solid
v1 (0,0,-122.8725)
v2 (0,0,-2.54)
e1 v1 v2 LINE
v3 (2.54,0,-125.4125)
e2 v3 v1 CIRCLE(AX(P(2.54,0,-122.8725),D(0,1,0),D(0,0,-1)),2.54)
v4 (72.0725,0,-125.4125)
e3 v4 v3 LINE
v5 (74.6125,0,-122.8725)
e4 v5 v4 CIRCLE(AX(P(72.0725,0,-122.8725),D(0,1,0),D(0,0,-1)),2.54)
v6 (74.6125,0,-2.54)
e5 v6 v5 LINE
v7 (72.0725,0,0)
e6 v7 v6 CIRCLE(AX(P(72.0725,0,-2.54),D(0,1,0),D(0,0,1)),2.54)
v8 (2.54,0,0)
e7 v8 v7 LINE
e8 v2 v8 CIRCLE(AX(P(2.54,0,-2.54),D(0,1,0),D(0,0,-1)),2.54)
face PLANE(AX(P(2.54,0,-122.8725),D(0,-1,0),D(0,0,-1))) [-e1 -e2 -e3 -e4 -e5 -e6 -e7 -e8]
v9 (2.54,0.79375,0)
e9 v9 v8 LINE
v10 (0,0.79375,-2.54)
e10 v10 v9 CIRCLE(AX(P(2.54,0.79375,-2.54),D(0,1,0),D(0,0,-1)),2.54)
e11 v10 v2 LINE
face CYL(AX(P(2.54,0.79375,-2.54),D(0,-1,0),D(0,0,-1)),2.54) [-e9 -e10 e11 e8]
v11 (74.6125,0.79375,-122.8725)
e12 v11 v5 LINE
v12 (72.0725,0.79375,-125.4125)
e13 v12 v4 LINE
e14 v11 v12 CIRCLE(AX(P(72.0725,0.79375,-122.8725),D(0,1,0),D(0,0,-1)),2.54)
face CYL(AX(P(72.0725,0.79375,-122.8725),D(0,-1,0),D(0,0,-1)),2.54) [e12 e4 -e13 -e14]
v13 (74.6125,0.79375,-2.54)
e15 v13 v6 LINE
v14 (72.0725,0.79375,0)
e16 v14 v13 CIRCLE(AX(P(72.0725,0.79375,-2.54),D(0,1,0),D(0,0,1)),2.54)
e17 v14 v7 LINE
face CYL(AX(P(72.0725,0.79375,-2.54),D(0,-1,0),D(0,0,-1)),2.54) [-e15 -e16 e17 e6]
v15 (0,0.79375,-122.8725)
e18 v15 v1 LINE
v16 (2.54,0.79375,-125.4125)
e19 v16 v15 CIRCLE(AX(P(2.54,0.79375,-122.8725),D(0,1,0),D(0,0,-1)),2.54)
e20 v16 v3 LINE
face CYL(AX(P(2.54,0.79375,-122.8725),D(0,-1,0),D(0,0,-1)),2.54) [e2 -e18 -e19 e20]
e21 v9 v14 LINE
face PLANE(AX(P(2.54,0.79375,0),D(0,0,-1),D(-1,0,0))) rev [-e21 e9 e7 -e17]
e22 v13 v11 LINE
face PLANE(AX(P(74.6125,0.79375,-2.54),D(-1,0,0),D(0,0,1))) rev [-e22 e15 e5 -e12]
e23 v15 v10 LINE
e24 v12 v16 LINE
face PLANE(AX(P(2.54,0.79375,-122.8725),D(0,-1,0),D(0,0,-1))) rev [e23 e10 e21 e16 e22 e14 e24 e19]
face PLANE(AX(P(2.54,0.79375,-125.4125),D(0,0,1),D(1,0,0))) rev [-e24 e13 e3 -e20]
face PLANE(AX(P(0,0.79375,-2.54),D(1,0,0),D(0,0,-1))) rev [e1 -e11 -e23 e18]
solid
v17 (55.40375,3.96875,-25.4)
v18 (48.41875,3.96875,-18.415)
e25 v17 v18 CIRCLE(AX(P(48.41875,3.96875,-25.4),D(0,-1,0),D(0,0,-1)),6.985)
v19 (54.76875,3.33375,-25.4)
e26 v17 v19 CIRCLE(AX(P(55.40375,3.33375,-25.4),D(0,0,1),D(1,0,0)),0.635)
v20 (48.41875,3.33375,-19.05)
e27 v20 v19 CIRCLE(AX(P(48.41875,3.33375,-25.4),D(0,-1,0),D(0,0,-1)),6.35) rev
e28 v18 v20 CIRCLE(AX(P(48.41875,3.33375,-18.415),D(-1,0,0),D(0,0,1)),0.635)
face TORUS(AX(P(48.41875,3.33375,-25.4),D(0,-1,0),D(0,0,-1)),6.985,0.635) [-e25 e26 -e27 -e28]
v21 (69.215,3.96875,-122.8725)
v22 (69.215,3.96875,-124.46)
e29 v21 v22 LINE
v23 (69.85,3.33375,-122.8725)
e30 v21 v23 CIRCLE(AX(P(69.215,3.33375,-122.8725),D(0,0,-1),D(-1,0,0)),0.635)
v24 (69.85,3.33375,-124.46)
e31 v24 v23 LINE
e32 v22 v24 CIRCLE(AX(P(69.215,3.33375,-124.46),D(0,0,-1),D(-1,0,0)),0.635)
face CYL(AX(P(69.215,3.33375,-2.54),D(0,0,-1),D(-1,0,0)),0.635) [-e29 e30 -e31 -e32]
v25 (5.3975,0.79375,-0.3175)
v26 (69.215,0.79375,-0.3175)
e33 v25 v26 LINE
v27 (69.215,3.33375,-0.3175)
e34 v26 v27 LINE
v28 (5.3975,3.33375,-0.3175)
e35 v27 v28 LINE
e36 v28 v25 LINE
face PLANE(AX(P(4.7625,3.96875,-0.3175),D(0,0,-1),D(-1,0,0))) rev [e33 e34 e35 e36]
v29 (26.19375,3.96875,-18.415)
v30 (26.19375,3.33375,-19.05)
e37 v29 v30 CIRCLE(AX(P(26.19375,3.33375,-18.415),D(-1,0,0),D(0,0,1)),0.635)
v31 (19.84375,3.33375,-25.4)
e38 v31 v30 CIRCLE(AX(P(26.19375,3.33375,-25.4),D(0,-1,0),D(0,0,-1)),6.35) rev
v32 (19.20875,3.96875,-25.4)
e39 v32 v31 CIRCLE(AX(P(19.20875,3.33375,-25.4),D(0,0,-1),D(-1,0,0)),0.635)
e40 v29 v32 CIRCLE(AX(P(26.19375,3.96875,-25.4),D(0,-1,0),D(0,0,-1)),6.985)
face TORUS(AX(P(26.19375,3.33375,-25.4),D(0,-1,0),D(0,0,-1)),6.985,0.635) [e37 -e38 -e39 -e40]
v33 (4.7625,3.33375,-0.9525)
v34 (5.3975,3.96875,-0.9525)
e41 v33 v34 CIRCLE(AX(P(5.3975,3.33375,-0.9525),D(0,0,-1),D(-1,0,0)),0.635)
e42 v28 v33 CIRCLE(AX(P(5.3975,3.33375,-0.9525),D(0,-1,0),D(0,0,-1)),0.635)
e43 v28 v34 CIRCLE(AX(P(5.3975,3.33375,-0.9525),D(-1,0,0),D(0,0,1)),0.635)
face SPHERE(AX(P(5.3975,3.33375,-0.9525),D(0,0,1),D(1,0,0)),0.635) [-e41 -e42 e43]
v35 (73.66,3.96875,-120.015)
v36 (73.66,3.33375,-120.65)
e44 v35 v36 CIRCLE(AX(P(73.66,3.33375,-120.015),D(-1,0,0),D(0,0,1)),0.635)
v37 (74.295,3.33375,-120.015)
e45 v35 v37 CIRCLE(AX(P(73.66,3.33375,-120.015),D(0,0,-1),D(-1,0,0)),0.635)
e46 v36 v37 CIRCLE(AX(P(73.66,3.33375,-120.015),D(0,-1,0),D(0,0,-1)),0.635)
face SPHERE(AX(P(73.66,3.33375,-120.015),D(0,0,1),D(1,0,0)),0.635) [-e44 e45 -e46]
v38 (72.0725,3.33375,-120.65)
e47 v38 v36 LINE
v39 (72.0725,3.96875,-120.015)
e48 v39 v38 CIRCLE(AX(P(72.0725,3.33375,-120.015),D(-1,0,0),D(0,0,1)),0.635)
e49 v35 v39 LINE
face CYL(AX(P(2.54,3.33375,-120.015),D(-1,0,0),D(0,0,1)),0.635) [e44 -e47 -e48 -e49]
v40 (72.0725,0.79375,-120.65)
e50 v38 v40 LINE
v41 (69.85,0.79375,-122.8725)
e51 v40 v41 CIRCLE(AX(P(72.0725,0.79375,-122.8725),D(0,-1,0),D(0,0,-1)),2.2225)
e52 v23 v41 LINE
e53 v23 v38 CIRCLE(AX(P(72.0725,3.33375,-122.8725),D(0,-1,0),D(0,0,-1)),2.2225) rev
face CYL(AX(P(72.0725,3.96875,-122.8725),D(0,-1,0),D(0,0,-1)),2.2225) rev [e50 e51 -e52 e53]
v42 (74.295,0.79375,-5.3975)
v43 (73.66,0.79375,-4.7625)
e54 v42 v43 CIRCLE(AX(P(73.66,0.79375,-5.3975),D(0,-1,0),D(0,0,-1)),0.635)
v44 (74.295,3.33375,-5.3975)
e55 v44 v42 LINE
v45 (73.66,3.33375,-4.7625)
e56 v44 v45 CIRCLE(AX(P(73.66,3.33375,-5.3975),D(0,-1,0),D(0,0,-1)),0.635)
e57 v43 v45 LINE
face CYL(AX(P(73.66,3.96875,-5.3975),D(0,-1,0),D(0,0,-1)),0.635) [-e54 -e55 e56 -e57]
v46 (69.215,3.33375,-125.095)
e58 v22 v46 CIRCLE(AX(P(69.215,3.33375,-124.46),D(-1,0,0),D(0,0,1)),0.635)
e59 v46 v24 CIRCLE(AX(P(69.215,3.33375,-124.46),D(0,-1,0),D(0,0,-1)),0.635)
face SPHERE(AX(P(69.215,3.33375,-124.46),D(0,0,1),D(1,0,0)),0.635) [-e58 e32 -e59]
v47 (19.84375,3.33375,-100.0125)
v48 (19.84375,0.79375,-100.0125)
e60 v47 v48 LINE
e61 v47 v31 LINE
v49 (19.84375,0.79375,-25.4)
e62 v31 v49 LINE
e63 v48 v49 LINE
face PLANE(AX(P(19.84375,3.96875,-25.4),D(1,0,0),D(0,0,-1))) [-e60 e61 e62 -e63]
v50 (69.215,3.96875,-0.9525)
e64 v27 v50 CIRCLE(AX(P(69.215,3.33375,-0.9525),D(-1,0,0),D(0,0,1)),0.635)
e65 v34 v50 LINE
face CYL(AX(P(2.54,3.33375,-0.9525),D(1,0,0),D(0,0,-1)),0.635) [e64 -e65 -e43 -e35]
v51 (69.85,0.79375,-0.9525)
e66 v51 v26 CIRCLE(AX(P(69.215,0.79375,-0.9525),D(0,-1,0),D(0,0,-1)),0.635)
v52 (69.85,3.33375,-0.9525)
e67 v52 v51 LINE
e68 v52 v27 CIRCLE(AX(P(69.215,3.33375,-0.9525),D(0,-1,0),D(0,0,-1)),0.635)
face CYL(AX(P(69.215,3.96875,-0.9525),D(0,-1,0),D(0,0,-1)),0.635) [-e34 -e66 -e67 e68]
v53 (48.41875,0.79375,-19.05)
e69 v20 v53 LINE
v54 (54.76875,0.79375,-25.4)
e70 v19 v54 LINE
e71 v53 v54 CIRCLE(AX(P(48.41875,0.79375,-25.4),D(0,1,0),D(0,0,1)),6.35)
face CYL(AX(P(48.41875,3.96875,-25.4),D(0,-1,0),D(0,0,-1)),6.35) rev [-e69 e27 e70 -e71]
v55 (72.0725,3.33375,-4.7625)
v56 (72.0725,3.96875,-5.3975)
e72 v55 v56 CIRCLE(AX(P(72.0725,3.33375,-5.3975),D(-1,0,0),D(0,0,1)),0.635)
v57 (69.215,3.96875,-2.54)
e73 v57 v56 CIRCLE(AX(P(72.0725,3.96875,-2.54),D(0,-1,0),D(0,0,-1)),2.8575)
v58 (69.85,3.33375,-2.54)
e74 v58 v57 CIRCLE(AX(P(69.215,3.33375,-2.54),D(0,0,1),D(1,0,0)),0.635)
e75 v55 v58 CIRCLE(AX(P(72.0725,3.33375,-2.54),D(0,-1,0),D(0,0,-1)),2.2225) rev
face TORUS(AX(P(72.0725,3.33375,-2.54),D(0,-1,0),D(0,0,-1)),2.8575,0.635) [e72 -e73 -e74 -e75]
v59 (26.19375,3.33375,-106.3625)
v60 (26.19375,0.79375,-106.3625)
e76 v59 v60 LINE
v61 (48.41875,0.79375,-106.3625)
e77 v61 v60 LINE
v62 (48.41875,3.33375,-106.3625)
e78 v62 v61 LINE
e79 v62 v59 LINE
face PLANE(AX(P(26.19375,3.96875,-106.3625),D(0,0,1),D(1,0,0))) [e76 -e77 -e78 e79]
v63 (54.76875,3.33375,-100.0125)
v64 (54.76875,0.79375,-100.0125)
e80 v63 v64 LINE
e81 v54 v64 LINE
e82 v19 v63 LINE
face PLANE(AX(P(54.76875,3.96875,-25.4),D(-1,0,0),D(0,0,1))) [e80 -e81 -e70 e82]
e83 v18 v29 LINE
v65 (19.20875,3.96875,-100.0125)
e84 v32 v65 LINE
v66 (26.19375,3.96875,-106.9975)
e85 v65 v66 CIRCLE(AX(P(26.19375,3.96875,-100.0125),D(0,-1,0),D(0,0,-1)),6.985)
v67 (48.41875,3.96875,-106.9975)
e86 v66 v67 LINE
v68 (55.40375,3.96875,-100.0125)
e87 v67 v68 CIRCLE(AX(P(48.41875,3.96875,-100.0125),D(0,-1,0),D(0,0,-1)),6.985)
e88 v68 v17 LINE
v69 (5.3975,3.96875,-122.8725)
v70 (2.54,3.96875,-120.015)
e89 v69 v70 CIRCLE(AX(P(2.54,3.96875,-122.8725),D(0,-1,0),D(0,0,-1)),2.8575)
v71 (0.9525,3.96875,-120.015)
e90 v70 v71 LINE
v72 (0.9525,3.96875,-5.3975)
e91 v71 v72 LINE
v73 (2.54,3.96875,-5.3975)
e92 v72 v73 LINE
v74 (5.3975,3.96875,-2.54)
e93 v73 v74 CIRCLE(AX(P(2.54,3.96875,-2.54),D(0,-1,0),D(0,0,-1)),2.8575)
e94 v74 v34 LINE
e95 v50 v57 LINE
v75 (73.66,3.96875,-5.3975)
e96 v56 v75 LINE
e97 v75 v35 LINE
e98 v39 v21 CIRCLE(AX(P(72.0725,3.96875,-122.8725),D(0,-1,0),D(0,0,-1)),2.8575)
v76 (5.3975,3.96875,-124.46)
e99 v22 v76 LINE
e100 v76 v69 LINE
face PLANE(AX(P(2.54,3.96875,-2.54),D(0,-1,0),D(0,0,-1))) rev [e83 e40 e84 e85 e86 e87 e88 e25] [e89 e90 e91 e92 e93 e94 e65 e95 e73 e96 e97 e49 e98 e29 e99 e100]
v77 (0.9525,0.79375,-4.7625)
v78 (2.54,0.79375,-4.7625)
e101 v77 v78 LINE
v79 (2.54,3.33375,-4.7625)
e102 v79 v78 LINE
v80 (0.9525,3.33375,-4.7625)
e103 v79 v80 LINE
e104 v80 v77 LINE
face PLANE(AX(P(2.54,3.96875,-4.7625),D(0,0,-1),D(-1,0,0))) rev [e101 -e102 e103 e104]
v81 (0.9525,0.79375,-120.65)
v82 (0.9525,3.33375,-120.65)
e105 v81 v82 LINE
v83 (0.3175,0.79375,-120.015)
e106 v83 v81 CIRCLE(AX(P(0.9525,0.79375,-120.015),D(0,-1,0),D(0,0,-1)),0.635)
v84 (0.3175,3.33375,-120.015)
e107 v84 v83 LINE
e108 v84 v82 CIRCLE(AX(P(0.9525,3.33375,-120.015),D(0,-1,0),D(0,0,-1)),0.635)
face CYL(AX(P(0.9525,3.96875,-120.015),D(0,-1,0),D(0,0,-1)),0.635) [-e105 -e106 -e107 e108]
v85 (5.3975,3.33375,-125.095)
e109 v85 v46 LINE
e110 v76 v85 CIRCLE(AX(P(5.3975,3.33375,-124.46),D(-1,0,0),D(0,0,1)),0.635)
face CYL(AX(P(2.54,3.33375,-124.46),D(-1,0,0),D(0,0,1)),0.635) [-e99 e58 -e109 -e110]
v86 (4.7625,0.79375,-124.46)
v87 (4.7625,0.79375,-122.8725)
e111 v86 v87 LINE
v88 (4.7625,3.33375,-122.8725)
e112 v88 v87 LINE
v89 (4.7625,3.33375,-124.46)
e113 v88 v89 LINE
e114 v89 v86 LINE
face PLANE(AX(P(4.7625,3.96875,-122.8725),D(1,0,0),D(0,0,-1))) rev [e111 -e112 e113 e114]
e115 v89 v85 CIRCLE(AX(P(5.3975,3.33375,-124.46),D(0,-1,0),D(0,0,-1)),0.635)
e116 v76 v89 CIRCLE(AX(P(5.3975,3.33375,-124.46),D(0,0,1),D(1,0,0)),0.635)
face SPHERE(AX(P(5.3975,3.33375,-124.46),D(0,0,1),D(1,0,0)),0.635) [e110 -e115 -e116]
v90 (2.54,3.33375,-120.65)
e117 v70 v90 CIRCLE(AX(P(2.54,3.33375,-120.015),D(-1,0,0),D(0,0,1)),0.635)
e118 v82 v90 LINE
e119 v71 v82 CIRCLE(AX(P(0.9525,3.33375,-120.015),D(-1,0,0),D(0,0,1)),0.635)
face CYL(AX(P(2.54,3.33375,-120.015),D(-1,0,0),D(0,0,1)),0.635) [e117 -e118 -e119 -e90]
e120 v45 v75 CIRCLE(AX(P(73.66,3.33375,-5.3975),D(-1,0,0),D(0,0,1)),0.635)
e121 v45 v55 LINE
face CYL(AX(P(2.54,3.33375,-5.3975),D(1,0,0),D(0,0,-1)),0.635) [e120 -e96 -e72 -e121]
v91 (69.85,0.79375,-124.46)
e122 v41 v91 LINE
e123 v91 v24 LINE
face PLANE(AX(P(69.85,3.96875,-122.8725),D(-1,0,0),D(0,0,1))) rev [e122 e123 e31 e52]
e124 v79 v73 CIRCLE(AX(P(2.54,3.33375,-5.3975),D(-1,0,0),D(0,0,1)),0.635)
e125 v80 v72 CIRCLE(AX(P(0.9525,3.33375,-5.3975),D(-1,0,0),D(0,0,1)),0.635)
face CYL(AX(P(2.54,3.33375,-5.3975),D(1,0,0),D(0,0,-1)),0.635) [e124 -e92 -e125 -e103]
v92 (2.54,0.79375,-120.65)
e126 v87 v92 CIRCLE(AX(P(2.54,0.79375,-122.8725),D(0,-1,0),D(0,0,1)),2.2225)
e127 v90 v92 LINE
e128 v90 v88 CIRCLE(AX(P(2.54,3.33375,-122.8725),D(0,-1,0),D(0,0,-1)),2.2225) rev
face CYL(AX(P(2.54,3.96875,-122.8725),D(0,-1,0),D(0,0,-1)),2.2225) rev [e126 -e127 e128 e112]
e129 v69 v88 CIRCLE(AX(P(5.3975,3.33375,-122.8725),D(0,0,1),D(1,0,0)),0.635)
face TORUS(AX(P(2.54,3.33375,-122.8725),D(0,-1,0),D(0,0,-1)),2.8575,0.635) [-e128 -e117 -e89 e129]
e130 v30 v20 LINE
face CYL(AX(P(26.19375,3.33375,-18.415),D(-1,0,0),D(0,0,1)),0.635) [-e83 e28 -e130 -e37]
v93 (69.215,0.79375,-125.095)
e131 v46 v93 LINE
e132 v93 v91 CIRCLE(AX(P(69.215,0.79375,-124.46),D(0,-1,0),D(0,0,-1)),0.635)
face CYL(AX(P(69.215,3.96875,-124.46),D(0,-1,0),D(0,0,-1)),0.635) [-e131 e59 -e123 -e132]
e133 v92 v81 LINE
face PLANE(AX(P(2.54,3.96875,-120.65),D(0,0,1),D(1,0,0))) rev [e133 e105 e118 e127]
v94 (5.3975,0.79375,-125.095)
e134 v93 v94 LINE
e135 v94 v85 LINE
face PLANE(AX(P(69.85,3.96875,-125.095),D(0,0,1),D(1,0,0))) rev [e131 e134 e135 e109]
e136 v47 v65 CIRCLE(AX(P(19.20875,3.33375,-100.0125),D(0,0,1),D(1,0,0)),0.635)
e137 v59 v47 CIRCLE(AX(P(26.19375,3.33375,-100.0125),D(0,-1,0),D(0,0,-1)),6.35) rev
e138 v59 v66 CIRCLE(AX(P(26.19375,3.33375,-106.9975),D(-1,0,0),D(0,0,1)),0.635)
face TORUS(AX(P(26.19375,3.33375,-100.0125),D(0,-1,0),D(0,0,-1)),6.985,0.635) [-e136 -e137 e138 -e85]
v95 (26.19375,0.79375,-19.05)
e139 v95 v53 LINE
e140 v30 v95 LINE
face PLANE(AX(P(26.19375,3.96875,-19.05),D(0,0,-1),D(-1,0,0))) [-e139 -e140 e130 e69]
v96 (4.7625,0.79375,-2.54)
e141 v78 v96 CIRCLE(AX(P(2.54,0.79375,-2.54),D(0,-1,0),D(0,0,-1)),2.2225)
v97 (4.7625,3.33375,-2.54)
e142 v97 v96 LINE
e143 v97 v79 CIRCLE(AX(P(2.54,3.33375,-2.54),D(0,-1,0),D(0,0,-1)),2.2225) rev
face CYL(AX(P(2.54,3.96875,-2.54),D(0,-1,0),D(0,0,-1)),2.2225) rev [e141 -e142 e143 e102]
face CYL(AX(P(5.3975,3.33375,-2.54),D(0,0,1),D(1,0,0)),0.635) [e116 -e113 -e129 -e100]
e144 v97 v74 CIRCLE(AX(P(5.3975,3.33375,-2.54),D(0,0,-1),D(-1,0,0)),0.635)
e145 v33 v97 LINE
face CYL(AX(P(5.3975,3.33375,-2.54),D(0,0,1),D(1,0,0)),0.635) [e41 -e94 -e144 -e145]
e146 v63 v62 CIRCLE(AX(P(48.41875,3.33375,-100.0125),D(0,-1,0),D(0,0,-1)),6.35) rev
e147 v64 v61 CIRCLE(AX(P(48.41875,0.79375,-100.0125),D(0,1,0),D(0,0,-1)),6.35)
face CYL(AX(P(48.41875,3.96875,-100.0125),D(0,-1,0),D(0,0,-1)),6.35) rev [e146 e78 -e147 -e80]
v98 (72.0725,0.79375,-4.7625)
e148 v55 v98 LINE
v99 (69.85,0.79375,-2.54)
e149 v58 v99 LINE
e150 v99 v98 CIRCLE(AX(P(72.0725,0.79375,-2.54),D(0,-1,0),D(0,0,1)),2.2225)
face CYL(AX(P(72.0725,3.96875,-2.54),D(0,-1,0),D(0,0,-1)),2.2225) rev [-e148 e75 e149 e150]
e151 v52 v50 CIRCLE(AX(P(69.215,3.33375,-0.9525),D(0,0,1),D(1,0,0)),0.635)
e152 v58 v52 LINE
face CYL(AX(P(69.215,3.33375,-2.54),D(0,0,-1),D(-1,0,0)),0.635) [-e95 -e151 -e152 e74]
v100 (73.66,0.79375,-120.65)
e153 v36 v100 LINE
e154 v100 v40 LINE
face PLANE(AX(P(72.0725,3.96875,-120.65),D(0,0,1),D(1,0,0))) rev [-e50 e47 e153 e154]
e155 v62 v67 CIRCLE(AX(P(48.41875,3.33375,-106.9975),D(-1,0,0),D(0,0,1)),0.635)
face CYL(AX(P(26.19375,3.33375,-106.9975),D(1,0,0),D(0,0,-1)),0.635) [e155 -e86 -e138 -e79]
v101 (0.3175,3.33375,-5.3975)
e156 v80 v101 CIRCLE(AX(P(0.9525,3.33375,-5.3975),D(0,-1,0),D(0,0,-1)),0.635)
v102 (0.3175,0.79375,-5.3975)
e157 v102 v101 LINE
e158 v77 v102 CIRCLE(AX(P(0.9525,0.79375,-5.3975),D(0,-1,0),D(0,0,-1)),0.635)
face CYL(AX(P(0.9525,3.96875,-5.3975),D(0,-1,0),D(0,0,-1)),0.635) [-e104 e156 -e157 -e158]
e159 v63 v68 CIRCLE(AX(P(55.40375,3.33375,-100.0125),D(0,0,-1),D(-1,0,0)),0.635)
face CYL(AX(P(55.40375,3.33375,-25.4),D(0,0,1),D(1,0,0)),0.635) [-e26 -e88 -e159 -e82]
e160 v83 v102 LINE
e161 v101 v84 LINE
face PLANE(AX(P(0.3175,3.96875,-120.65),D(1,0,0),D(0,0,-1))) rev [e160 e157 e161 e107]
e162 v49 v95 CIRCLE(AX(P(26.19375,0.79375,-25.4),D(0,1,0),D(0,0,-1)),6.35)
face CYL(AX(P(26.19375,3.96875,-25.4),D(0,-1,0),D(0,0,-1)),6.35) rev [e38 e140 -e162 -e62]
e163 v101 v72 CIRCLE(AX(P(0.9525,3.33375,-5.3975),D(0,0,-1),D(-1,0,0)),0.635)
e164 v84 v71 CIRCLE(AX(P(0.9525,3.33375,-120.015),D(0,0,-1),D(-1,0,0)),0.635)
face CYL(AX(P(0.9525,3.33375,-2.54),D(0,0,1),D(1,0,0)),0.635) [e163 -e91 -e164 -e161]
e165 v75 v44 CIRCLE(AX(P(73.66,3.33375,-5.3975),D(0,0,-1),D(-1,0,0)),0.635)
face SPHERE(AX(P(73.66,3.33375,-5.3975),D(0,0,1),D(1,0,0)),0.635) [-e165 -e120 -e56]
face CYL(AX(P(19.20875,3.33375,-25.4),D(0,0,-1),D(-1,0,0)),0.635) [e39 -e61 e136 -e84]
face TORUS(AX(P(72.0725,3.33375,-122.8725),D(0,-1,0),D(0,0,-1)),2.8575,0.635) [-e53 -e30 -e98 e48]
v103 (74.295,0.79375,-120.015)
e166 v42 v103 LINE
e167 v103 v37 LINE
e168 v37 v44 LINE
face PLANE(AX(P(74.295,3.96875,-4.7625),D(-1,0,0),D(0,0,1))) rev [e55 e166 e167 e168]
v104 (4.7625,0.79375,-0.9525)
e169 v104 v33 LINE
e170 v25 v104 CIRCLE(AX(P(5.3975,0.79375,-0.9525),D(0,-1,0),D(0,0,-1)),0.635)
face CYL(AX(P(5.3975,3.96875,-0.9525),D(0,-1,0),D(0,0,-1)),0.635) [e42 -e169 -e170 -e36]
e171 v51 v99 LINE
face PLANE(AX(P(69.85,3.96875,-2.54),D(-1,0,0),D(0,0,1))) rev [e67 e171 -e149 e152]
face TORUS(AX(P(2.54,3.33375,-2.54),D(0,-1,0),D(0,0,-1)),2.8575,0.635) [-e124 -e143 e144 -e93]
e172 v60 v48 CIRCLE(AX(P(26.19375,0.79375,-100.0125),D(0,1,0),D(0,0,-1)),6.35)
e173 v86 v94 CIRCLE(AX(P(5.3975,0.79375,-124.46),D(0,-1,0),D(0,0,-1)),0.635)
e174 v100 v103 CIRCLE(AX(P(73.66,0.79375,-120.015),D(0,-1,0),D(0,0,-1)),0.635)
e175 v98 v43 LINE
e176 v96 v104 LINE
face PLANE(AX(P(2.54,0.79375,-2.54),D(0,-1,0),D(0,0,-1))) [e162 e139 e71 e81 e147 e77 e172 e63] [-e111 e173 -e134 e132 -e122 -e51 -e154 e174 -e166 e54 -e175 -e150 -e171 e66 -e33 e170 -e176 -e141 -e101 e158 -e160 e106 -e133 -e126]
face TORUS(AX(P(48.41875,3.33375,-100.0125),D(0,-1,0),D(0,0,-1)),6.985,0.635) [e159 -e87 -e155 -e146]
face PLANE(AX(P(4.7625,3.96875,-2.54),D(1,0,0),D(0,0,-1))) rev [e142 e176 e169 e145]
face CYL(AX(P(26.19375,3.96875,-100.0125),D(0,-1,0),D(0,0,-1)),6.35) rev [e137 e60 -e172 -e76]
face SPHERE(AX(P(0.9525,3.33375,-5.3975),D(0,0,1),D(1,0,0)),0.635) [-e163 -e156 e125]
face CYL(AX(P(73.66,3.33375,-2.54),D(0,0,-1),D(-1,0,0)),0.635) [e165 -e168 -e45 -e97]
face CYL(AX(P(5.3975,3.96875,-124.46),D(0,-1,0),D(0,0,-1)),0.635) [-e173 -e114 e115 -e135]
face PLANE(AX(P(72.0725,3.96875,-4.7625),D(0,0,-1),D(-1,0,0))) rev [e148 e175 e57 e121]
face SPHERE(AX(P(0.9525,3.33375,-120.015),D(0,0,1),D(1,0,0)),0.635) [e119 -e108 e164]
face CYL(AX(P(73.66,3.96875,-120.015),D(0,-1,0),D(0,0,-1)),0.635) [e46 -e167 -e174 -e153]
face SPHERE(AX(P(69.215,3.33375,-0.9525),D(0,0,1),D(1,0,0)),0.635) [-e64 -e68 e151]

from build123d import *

# Parameters (mm, degrees)
BASE_FLANGE1_DEPTH = 0.79375
EXTRUDE1_DEPTH     = 3.175
FILLET1_R          = 0.635
FILLET2_R          = 0.635


# Sheet-metal steps are written as plain solids
with BuildPart() as part:
    # Sketch1 → Base-Flange1 (new body)
    with BuildSketch(Plane(origin=(0, 0, 0), x_dir=(1, 0, 0), z_dir=(0, 1, 0))):
        with BuildLine():
            Line((2.54, 0), (72.0725, 0))
            ThreePointArc((72.0725, 0), (73.868551224, 0.743948776), (74.6125, 2.54))
            Line((74.6125, 2.54), (74.6125, 122.8725))
            ThreePointArc((74.6125, 122.8725), (73.868551224, 124.668551224), (72.0725, 125.4125))
            Line((72.0725, 125.4125), (2.54, 125.4125))
            ThreePointArc((2.54, 125.4125), (0.743948776, 124.668551224), (0, 122.8725))
            Line((0, 122.8725), (0, 2.54))
            ThreePointArc((0, 2.54), (0.743948776, 0.743948776), (2.54, 0))
        make_face()
    extrude(amount=BASE_FLANGE1_DEPTH)


with BuildPart() as body_2:
    # Sketch3 → Extrude1 (new body)
    with BuildSketch(Plane(origin=(0, 0.79375, 0), x_dir=(-1, 0, 0), z_dir=(0, 1, 0))):
        with BuildLine():
            Line((-69.85, -125.095), (-4.7625, -125.095))
            Line((-4.7625, -125.095), (-4.7625, -122.8725))
            ThreePointArc((-4.7625, -122.8725), (-4.111544821, -121.300955179), (-2.54, -120.65))
            Line((-2.54, -120.65), (-0.3175, -120.65))
            Line((-0.3175, -120.65), (-0.3175, -4.7625))
            Line((-0.3175, -4.7625), (-2.54, -4.7625))
            ThreePointArc((-2.54, -4.7625), (-4.111544821, -4.111544821), (-4.7625, -2.54))
            Line((-4.7625, -2.54), (-4.7625, -0.3175))
            Line((-4.7625, -0.3175), (-69.85, -0.3175))
            Line((-69.85, -0.3175), (-69.85, -2.54))
            ThreePointArc((-69.85, -2.54), (-70.500955179, -4.111544821), (-72.0725, -4.7625))
            Line((-72.0725, -4.7625), (-74.295, -4.7625))
            Line((-74.295, -4.7625), (-74.295, -120.65))
            Line((-74.295, -120.65), (-72.0725, -120.65))
            ThreePointArc((-72.0725, -120.65), (-70.500955179, -121.300955179), (-69.85, -122.8725))
            Line((-69.85, -122.8725), (-69.85, -125.095))
        make_face()
        with BuildLine():
            Line((-26.19375, -19.05), (-48.41875, -19.05))
            ThreePointArc((-48.41875, -19.05), (-52.908878061, -20.909871939), (-54.76875, -25.4))
            Line((-54.76875, -25.4), (-54.76875, -100.0125))
            ThreePointArc((-54.76875, -100.0125), (-52.908878061, -104.502628061), (-48.41875, -106.3625))
            Line((-48.41875, -106.3625), (-26.19375, -106.3625))
            ThreePointArc((-26.19375, -106.3625), (-21.703621939, -104.502628061), (-19.84375, -100.0125))
            Line((-19.84375, -100.0125), (-19.84375, -25.4))
            ThreePointArc((-19.84375, -25.4), (-21.703621939, -20.909871939), (-26.19375, -19.05))
        make_face(mode=Mode.SUBTRACT)
    extrude(amount=EXTRUDE1_DEPTH)

    # Fillet1
    fillet1_edges = [body_2.edges().sort_by_distance(p)[0] for p in [
        (0.3175, 2.38125, -4.7625),
        (0.3175, 2.38125, -120.65),
        (4.7625, 2.38125, -125.095),
        (69.85, 2.38125, -125.095),
        (74.295, 2.38125, -120.65),
        (74.295, 2.38125, -4.7625),
        (69.85, 2.38125, -0.3175),
        (4.7625, 2.38125, -0.3175),
    ]]
    fillet(fillet1_edges, radius=FILLET1_R)

    # Fillet2
    fillet2_edges = [body_2.edges().sort_by_distance(p)[0] for p in [
        (70.500955179, 3.96875, -4.111544821),
        (72.86625, 3.96875, -4.7625),
        (70.500955179, 3.96875, -121.300955179),
        (69.85, 3.96875, -123.66625),
        (4.111544821, 3.96875, -4.111544821),
        (4.111544821, 3.96875, -121.300955179),
        (1.74625, 3.96875, -120.65),
        (21.703621939, 3.96875, -104.502628061),
        (19.84375, 3.96875, -62.70625),
        (21.703621939, 3.96875, -20.909871939),
        (37.30625, 3.96875, -19.05),
        (52.908878061, 3.96875, -20.909871939),
        (54.76875, 3.96875, -62.70625),
        (52.908878061, 3.96875, -104.502628061),
        (37.30625, 3.96875, -106.3625),
        (4.7625, 3.96875, -1.74625),
        (1.74625, 3.96875, -4.7625),
        (0.3175, 3.96875, -62.70625),
        (37.30625, 3.96875, -0.3175),
        (69.85, 3.96875, -1.74625),
        (74.295, 3.96875, -62.70625),
        (72.86625, 3.96875, -120.65),
        (37.30625, 3.96875, -125.095),
        (4.7625, 3.96875, -123.66625),
        (4.948487194, 3.96875, -124.909012806),
        (0.503487194, 3.96875, -120.464012806),
        (69.664012806, 3.96875, -124.909012806),
        (74.109012806, 3.96875, -120.464012806),
        (74.109012806, 3.96875, -4.948487194),
        (69.664012806, 3.96875, -0.503487194),
        (4.948487194, 3.96875, -0.503487194),
        (0.503487194, 3.96875, -4.948487194),
    ]]
    fillet(fillet2_edges, radius=FILLET2_R)


solid = Compound([part.part, body_2.part])
